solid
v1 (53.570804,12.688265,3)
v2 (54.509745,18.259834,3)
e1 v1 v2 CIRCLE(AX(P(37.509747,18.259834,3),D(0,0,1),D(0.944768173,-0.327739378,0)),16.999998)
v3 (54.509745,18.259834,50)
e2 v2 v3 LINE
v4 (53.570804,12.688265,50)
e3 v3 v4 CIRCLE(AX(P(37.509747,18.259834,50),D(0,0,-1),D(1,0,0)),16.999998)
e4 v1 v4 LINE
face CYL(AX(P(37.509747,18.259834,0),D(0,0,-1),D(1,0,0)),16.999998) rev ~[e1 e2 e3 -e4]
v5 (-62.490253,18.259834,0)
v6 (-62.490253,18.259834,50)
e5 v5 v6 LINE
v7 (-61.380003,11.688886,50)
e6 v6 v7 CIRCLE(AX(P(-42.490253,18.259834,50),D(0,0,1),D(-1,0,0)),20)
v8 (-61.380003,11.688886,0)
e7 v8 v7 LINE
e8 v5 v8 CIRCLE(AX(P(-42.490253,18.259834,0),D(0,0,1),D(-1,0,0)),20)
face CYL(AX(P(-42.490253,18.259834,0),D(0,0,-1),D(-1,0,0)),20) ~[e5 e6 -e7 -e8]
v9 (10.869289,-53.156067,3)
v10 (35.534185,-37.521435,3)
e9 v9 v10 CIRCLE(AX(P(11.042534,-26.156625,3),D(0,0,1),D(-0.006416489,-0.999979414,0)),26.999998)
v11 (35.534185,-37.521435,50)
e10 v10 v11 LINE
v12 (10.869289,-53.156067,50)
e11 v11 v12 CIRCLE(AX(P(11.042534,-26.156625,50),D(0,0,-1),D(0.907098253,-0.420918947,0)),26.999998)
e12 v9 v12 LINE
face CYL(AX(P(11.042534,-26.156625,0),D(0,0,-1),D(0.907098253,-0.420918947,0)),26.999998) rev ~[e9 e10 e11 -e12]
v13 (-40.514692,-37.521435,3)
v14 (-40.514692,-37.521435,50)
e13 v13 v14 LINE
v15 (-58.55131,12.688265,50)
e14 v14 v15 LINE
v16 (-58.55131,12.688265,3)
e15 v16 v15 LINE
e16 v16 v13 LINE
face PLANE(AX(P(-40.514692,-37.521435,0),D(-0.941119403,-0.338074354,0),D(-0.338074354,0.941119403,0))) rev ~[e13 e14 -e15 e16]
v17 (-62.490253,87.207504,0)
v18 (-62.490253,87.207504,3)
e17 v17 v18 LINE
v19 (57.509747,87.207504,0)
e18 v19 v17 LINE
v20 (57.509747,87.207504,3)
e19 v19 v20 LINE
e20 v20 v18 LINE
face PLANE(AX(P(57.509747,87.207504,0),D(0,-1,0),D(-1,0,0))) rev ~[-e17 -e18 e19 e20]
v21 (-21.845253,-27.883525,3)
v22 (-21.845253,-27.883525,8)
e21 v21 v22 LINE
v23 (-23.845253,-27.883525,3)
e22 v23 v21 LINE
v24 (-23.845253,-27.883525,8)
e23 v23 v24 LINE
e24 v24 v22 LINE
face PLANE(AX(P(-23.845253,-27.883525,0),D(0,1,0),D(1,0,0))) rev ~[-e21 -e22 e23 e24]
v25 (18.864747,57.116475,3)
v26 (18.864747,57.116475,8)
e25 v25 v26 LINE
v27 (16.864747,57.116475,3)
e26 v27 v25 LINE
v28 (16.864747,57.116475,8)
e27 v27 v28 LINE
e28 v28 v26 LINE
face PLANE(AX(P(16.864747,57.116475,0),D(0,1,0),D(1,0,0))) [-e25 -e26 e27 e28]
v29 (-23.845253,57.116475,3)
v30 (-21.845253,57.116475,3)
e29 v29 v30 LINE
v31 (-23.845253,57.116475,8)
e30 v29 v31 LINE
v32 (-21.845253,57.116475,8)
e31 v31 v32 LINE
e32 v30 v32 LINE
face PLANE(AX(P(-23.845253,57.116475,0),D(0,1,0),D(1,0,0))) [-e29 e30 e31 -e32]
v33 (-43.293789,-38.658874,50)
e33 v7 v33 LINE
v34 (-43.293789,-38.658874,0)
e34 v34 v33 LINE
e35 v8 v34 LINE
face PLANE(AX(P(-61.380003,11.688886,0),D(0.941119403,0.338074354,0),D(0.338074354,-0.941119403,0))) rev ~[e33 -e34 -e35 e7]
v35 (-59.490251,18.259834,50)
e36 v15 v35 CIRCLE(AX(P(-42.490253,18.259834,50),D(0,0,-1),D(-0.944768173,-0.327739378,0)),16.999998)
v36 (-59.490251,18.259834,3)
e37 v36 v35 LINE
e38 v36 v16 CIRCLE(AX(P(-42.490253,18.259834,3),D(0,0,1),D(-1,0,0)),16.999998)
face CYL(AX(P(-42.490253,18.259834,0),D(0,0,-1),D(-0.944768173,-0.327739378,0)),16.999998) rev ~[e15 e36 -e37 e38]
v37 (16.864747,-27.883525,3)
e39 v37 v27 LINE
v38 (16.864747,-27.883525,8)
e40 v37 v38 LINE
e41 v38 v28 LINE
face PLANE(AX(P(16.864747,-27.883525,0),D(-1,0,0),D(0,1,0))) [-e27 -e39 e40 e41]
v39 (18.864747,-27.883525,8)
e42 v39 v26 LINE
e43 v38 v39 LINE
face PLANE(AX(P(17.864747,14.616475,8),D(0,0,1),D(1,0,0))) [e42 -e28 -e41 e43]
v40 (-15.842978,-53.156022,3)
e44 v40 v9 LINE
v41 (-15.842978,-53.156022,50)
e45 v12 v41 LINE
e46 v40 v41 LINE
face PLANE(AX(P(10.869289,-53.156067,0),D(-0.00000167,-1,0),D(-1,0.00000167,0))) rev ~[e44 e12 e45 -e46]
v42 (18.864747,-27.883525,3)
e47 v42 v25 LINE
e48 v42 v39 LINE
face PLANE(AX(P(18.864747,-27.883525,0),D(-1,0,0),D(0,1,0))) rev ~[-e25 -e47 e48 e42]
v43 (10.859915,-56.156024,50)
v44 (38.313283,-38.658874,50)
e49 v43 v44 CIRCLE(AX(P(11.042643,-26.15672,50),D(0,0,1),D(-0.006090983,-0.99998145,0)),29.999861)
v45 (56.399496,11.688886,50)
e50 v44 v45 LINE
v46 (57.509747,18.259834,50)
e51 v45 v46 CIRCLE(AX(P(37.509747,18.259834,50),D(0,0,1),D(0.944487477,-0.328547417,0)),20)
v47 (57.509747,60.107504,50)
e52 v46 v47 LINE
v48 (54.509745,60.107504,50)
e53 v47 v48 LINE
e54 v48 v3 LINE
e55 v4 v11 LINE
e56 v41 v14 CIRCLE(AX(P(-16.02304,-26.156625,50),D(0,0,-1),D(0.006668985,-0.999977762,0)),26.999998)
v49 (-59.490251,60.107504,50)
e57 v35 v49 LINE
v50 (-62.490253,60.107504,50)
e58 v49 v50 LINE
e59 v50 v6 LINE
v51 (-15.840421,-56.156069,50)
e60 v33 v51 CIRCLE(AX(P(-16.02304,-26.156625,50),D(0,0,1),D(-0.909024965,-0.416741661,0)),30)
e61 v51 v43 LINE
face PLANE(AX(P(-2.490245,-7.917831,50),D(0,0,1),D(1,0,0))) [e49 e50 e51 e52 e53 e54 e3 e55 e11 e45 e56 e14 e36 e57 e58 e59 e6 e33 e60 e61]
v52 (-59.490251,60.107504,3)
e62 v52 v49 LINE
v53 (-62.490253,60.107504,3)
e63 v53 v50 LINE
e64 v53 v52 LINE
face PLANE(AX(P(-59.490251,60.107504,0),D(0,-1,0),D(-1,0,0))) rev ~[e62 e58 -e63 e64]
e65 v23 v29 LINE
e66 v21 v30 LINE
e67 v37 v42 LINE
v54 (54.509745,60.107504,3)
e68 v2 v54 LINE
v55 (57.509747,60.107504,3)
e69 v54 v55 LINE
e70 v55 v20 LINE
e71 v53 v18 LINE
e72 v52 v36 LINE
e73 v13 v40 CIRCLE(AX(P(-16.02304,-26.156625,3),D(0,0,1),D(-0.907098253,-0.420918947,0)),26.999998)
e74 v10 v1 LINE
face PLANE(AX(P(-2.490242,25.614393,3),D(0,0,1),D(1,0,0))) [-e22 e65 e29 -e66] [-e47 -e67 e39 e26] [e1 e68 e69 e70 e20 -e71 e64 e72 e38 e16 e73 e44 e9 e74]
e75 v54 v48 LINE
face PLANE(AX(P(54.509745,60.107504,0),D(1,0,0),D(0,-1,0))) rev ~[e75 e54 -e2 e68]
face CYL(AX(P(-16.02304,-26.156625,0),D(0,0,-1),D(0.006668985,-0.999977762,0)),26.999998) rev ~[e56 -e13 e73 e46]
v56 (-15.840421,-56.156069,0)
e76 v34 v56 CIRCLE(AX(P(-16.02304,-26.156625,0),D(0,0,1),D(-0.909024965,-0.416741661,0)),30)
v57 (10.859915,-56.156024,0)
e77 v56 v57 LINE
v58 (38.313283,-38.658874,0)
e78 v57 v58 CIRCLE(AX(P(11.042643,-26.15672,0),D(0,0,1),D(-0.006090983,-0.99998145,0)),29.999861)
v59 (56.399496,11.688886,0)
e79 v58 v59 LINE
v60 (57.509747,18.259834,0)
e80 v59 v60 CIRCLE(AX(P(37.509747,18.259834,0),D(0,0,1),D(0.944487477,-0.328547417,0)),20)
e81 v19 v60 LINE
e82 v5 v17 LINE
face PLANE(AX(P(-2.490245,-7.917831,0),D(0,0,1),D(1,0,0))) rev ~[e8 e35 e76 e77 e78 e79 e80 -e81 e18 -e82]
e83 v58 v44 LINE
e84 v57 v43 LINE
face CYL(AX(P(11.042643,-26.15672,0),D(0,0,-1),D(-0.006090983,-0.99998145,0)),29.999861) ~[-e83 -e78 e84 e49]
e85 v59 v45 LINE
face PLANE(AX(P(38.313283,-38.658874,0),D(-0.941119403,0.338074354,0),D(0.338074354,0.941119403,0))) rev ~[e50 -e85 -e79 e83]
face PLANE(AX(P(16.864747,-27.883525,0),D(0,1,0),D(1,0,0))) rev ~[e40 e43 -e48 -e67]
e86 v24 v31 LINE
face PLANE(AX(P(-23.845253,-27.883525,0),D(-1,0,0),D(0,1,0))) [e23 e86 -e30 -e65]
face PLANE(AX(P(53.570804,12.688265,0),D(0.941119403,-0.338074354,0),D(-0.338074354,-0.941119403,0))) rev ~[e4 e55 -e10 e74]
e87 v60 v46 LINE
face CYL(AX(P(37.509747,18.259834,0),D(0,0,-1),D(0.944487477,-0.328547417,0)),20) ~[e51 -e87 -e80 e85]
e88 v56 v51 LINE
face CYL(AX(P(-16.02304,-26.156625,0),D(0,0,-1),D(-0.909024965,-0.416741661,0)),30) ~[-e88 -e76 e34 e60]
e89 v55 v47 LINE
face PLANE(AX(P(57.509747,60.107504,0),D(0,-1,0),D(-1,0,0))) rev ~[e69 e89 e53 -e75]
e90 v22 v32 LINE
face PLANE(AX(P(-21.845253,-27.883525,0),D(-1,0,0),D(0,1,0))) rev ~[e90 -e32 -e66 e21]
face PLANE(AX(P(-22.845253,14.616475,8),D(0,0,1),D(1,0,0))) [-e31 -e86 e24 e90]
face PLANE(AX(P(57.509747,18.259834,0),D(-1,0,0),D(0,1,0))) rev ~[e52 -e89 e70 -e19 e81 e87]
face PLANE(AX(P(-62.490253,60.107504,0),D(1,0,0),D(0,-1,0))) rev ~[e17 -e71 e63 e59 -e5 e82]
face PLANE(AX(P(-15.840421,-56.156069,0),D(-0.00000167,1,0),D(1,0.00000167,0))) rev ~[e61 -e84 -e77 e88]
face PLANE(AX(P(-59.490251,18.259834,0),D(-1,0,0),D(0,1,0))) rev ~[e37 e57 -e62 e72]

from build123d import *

# Parameters (mm, degrees)
F0_W     = 2
F0_H     = 85
F0_W_2   = 3.0000019335
F0_H_2   = 27.1
F1_DEPTH = 3
F2_DEPTH = 50
F3_DEPTH = 8


# Not quite as in the source:
# - ends of sketch curves that miss each other by under 0.0002 mm in the source are joined


with BuildPart() as f1:
    # F0 (on Top) → F1 (new body)
    with BuildSketch(Plane.XY):
        with BuildLine():
            Line((54.5097446937, 40.5472581927), (54.5097446937, 60.1075036168))
            Line((54.5097446937, 60.1075036168), (54.5097446937, 87.2075036168))
            Line((54.5097446937, 87.2075036168), (-59.4902514393, 87.2075036168))
            Line((-59.4902514393, 87.2075036168), (-59.4902514393, 60.1075036168))
            Line((-59.4902514393, 60.1075036168), (-59.4902514393, 40.5472581927))
            Line((-59.4902514393, 40.5472581927), (-59.4902514393, 18.2598339378))
            ThreePointArc((-59.4902514393, 18.2598339378), (-59.2538728212, 15.4347680531), (-58.5513104793, 12.6882651386))
            Line((-58.5513104793, 12.6882651386), (-40.5146915017, -37.5214353961))
            ThreePointArc((-40.5146915017, -37.5214353961), (-30.4754938788, -48.962906346), (-15.8429778585, -53.1560222908))
            Line((-15.8429778585, -53.1560222908), (10.8692885058, -53.1560668961))
            ThreePointArc((10.8692885058, -53.1560668961), (25.4978663276, -48.9610815315), (35.534184756, -37.5214353961))
            Line((35.534184756, -37.5214353961), (53.5708037336, 12.6882651386))
            ThreePointArc((53.5708037336, 12.6882651386), (54.2733660755, 15.4347680531), (54.5097446937, 18.2598339378))
            Line((54.5097446937, 18.2598339378), (54.5097446937, 40.5472581927))
        make_face()
        with Locations((-22.8452533728, 14.6164752861)):
            Rectangle(F0_W, F0_H, mode=Mode.SUBTRACT)
        with Locations((17.8647466272, 14.6164752861)):
            Rectangle(F0_W, F0_H, mode=Mode.SUBTRACT)
        with Locations((-60.9902524061, 73.6575036168)):
            Rectangle(F0_W_2, F0_H_2)
        with Locations((56.0097456604, 73.6575036168)):
            Rectangle(F0_W_2, F0_H_2)
    extrude(amount=F1_DEPTH)

    # F0 (on Top) → F2 (join)
    with BuildSketch(Plane.XY):
        with BuildLine():
            Line((-15.8404213062, -56.156068814), (10.8599145605, -56.1560242285))
            ThreePointArc((10.8599145605, -56.1560242285), (27.1664180437, -51.4552481906), (38.3132826454, -38.6588744882))
            Line((38.3132826454, -38.6588744882), (56.3994961696, 11.6888855872))
            ThreePointArc((56.3994961696, 11.6888855872), (57.2302307851, 14.9277918348), (57.5097466272, 18.2598339378))
            Line((57.5097466272, 18.2598339378), (57.5097466272, 40.2075055503))
            Line((57.5097466272, 40.2075055503), (57.5097466272, 60.1075036168))
            Line((57.5097466272, 60.1075036168), (54.5097446937, 60.1075036168))
            Line((54.5097446937, 60.1075036168), (54.5097446937, 40.5472581927))
            Line((54.5097446937, 40.5472581927), (54.5097446937, 18.2598339378))
            ThreePointArc((54.5097446937, 18.2598339378), (54.2733660755, 15.4347680531), (53.5708037336, 12.6882651386))
            Line((53.5708037336, 12.6882651386), (35.534184756, -37.5214353961))
            ThreePointArc((35.534184756, -37.5214353961), (25.4978663276, -48.9610815315), (10.8692885058, -53.1560668961))
            Line((10.8692885058, -53.1560668961), (-15.8429778585, -53.1560222908))
            ThreePointArc((-15.8429778585, -53.1560222908), (-30.4754938788, -48.962906346), (-40.5146915017, -37.5214353961))
            Line((-40.5146915017, -37.5214353961), (-58.5513104793, 12.6882651386))
            ThreePointArc((-58.5513104793, 12.6882651386), (-59.2538728212, 15.4347680531), (-59.4902514393, 18.2598339378))
            Line((-59.4902514393, 18.2598339378), (-59.4902514393, 40.5472581927))
            Line((-59.4902514393, 40.5472581927), (-59.4902514393, 60.1075036168))
            Line((-59.4902514393, 60.1075036168), (-62.4902533728, 60.1075036168))
            Line((-62.4902533728, 60.1075036168), (-62.4902533728, 40.2075055503))
            Line((-62.4902533728, 40.2075055503), (-62.4902533728, 18.2598339378))
            ThreePointArc((-62.4902533728, 18.2598339378), (-62.2107375308, 14.9277918348), (-61.3800029152, 11.6888855872))
            Line((-61.3800029152, 11.6888855872), (-43.293789391, -38.6588744882))
            ThreePointArc((-43.293789391, -38.6588744882), (-32.1469247894, -51.4552481906), (-15.8404213062, -56.156068814))
        make_face()
    extrude(amount=F2_DEPTH)

    # F0 (on Top) → F3 (join)
    with BuildSketch(Plane.XY):
        with Locations((17.8647466272, 14.6164752861)):
            Rectangle(F0_W, F0_H)
        with Locations((-22.8452533728, 14.6164752861)):
            Rectangle(F0_W, F0_H)
    extrude(amount=F3_DEPTH)


solid = f1.part
